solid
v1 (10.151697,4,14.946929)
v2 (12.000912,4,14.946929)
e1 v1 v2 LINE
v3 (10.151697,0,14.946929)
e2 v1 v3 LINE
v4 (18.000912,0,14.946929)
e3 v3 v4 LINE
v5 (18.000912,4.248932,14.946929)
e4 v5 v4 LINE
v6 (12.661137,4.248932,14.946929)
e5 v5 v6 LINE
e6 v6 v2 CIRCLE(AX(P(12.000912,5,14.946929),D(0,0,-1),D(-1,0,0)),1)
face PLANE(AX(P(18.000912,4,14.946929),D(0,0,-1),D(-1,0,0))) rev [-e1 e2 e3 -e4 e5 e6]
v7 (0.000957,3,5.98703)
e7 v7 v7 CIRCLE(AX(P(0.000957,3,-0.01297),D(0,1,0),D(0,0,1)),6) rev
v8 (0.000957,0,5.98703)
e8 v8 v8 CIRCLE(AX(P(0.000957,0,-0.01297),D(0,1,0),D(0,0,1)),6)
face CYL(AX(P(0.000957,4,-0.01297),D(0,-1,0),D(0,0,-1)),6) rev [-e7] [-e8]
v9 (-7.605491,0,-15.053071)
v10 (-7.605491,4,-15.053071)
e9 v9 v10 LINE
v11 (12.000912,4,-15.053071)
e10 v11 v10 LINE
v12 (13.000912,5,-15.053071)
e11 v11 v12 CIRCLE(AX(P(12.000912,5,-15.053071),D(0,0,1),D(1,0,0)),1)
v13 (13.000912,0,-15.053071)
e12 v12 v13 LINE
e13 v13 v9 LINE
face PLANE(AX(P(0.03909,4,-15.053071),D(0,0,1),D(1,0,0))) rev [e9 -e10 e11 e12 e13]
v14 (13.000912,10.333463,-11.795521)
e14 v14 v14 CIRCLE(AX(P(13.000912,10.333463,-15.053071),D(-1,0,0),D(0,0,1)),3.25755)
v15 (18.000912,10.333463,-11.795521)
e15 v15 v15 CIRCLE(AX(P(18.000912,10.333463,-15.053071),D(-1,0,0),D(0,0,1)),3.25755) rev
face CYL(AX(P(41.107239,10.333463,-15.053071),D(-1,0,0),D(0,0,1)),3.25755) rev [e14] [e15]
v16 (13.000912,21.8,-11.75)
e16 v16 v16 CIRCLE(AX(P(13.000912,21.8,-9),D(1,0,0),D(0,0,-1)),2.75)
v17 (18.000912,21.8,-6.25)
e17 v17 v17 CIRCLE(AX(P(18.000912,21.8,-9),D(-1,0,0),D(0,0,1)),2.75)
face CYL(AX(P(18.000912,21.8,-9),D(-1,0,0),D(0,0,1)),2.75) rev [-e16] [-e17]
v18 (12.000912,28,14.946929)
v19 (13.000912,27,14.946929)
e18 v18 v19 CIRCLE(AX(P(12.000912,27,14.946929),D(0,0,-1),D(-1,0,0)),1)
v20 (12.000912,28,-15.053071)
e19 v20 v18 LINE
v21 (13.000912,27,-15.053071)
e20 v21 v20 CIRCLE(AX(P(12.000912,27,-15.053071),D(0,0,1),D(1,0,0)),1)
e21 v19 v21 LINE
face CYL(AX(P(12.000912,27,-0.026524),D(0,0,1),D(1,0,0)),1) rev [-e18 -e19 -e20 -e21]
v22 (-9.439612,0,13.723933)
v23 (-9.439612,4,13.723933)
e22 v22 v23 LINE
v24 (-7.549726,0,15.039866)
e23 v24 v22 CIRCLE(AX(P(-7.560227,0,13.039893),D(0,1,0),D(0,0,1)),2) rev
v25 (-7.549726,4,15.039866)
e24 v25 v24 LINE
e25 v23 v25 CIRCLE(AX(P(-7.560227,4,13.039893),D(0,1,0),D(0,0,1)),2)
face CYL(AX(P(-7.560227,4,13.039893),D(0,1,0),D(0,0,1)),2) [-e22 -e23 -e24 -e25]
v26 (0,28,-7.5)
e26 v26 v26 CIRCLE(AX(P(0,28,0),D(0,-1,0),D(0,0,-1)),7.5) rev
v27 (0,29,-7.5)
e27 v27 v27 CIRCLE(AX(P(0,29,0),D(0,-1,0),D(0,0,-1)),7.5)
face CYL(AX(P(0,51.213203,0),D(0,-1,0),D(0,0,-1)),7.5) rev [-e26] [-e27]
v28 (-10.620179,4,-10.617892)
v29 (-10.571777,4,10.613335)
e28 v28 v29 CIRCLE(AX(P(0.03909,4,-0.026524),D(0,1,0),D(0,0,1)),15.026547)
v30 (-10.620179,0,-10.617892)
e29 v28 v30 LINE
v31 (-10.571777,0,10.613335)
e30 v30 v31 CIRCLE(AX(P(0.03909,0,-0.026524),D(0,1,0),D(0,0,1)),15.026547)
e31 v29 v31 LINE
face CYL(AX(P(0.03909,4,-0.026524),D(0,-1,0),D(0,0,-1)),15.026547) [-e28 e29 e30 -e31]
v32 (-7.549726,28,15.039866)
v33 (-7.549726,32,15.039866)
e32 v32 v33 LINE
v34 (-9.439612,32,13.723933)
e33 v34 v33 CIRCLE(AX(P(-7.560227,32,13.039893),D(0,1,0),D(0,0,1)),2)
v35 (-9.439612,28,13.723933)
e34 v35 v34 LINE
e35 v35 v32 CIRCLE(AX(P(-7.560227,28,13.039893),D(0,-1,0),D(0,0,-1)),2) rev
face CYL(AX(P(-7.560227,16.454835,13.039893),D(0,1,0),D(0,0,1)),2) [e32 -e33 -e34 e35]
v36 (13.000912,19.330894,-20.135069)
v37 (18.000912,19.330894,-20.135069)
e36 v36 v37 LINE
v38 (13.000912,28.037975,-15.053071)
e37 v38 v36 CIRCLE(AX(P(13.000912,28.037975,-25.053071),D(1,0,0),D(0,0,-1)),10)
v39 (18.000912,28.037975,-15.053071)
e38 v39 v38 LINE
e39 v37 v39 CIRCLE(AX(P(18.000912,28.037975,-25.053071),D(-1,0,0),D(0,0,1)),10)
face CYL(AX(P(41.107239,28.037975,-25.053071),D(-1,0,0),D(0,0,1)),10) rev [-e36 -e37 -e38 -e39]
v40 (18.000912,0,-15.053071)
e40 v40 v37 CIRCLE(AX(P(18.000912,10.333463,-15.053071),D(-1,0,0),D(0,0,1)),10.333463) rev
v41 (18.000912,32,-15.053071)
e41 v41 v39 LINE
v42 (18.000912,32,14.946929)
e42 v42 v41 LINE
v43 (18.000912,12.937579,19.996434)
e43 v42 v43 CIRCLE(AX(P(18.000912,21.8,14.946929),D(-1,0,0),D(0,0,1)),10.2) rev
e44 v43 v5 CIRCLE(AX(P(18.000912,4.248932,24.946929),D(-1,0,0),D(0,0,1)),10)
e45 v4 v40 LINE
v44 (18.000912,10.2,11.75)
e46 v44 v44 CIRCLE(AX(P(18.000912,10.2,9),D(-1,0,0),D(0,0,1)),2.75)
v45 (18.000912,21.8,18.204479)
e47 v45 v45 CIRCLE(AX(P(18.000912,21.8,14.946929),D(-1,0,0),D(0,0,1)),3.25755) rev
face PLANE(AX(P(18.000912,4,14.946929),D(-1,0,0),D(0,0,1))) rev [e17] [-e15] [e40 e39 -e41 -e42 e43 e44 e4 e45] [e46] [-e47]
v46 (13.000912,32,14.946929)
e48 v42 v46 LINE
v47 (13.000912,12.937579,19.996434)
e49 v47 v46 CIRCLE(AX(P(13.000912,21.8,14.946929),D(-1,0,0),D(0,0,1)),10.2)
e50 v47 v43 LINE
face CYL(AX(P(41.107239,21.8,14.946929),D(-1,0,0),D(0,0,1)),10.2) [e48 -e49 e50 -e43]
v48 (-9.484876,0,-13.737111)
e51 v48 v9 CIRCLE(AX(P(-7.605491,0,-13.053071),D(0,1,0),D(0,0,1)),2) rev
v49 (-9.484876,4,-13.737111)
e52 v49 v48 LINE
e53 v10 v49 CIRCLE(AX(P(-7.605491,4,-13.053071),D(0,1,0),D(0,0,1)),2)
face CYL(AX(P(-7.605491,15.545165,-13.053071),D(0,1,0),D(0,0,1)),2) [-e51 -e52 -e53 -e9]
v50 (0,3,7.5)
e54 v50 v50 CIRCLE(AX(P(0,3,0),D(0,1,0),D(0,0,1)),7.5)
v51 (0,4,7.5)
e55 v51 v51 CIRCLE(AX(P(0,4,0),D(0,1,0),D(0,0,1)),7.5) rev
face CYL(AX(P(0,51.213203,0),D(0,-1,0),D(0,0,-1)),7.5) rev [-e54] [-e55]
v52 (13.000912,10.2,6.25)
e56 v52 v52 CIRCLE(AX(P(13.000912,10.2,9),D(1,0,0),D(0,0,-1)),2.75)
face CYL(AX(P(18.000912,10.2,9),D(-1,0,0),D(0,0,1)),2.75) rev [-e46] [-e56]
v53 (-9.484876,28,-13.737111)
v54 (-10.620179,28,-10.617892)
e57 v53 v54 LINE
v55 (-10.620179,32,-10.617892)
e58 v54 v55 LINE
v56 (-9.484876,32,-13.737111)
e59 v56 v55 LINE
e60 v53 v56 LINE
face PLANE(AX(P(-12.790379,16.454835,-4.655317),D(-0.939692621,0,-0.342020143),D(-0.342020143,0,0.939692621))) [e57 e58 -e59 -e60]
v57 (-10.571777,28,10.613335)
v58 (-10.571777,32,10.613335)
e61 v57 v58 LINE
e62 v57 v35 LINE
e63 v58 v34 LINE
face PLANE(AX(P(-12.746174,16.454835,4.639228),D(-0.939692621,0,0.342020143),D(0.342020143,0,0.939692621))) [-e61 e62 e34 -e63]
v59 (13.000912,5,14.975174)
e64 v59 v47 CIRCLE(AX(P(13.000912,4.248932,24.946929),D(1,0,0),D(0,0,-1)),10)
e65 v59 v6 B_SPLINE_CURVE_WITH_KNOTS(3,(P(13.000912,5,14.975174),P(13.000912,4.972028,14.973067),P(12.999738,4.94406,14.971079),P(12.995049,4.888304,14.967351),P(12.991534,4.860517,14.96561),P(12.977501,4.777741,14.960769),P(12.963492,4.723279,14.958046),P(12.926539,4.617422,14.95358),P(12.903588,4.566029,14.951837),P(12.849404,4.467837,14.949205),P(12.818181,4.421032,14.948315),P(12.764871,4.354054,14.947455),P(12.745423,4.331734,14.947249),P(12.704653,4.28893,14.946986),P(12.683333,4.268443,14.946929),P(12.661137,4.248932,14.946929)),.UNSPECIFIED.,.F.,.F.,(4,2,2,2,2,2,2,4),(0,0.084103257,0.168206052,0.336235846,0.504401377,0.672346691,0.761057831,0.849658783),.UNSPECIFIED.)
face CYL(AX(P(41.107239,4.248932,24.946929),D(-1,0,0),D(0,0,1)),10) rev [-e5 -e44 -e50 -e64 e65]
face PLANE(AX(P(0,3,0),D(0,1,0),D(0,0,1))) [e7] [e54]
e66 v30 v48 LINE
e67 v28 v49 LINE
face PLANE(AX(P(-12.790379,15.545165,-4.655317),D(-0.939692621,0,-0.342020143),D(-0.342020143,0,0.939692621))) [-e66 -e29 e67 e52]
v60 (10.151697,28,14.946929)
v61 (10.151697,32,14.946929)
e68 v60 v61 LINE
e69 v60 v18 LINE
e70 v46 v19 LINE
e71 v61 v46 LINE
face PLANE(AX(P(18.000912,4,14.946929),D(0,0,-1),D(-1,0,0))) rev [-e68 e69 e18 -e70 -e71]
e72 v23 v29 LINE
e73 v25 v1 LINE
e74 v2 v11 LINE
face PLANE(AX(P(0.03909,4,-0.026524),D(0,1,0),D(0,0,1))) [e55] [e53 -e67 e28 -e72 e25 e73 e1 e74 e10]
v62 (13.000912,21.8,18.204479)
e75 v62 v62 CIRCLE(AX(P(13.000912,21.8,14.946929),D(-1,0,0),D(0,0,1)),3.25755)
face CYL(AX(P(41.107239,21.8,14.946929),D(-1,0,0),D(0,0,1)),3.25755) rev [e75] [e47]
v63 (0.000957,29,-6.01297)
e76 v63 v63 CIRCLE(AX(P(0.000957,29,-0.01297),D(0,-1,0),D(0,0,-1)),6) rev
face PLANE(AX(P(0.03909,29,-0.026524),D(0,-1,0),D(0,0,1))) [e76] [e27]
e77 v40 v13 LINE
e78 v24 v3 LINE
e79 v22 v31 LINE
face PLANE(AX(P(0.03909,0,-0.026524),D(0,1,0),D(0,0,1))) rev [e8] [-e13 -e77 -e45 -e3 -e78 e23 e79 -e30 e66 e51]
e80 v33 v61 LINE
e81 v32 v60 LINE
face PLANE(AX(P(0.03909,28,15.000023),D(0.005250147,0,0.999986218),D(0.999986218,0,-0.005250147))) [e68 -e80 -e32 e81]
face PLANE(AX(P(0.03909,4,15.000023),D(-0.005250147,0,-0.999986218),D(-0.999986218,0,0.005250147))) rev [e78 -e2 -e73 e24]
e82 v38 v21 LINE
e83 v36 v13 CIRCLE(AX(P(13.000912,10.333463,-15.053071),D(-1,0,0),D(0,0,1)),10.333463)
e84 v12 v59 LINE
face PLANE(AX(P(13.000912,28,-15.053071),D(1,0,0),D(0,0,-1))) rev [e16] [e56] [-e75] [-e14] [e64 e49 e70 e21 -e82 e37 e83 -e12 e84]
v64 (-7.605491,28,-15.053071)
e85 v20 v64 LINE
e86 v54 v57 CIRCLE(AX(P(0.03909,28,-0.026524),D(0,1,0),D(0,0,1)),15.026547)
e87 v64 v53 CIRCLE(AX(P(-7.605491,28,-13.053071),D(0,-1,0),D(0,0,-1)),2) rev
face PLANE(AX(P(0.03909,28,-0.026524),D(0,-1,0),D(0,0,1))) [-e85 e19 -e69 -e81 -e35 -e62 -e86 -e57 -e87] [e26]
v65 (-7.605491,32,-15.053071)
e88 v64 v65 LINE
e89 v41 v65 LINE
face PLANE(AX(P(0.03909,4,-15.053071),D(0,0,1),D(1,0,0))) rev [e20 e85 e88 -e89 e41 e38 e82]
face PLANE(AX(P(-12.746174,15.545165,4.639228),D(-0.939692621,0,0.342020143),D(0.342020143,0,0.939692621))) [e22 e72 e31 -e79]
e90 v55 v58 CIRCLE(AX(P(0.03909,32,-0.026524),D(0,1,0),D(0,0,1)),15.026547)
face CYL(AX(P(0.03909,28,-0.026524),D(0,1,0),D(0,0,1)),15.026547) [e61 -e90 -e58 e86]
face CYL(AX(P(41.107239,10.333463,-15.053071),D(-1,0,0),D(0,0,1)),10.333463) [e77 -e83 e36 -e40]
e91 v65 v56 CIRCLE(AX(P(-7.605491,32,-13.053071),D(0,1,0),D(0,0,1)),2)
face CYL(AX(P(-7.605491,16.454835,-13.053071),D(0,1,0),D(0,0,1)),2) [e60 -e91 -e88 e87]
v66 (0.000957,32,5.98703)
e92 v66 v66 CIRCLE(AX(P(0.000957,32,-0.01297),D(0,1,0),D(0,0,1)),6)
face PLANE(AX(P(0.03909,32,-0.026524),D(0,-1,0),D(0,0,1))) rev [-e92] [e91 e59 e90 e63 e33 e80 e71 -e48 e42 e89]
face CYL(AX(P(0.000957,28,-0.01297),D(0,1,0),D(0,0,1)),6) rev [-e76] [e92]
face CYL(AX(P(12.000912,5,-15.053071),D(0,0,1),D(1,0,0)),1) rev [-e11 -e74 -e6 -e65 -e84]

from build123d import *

# Parameters (mm, degrees)
SKETCH2_R               = 6
BOSS_EXTRUDE1_DEPTH     = 4
SKETCH3_W               = 5
SKETCH3_H               = 30
BOSS_EXTRUDE3_DEPTH     = 24
BOSS_EXTRUDE5_DEPTH     = 5
SKETCH7_3_R             = 3.25755
CUT_EXTRUDE3_DEPTH      = 5
FILLET3_R               = 10
CUT_EXTRUDE4_DEPTH      = 25
CUT_EXTRUDE4_DEPTH_BACK = 1
SKETCH8_R               = 7.5
CUT_EXTRUDE5_DEPTH      = 50.515905416
CUT_EXTRUDE5_DEPTH_BACK = 50.515905416
SKETCH9_R               = 2.75
FILLET4_R               = 1
BOSS_EXTRUDE6_DEPTH     = 4
FILLET6_R               = 2
BOSS_EXTRUDE7_DEPTH     = 4


with BuildPart() as part:
    # Sketch2 → Boss-Extrude1 (new body)
    with BuildSketch(Plane(origin=(0, 0, 0), x_dir=(1, 0, 0), z_dir=(0, 1, 0))):
        with BuildLine():
            Line((18.000912404, -14.946929254), (18.000912404, 15.053070746))
            Line((18.000912404, 15.053070746), (0.039090451, 15.053070746))
            ThreePointArc((0.039090451, 15.053070746), (-10.199781301, 11.024824414), (-14.94907539, 1.099832277))
            ThreePointArc((-14.94907539, 1.099832277), (-10.959209921, -10.21234771), (0.039090451, -15.000022662))
            Line((0.039090451, -15.000022662), (10.151696986, -14.946929254))
            Line((10.151696986, -14.946929254), (18.000912404, -14.946929254))
        make_face()
        with Locations(Location((0.000957071, 0.012970337, 0), (0, 0, 270))):
            Circle(SKETCH2_R, mode=Mode.SUBTRACT)
    boss_extrude1 = extrude(amount=BOSS_EXTRUDE1_DEPTH)

    # Sketch3 → Boss-Extrude3 (add)
    with BuildSketch(Plane(origin=(0, 4, 0), x_dir=(1, 0, 0), z_dir=(0, 1, 0))):
        with Locations((15.500912404, 0.053070746)):
            Rectangle(SKETCH3_W, SKETCH3_H)
    extrude(amount=BOSS_EXTRUDE3_DEPTH)

    # Mirror1: Boss-Extrude1 across plane
    add(boss_extrude1.mirror(Plane.ZX.offset(16)))

    # Sketch7 → Boss-Extrude5 (add)
    with BuildSketch(Plane.ZY.offset(-13.000912404)):
        with BuildLine():
            Line((-15.053070746, 0), (-15.053070746, 4))
            Line((-15.053070746, 4), (-15.053070746, 7.075913265))
            ThreePointArc((-15.053070746, 7.075913265), (-18.310620746, 10.333463265), (-15.053070746, 13.591013265))
            Line((-15.053070746, 13.591013265), (-15.053070746, 20.666926531))
            ThreePointArc((-15.053070746, 20.666926531), (-25.386534011, 10.333463265), (-15.053070746, 0))
        make_face()
        with BuildLine():
            ThreePointArc((25.146929254, 21.8), (22.159418422, 29.012489168), (14.946929254, 32))
            Line((14.946929254, 32), (14.946929254, 28))
            Line((14.946929254, 28), (14.946929254, 25.05755))
            ThreePointArc((14.946929254, 25.05755), (17.250364949, 24.103435695), (18.204479254, 21.8))
            ThreePointArc((18.204479254, 21.8), (17.250364949, 19.496564305), (14.946929254, 18.54245))
            Line((14.946929254, 18.54245), (14.946929254, 11.6))
            ThreePointArc((14.946929254, 11.6), (22.159418422, 14.587510832), (25.146929254, 21.8))
        make_face()
        with BuildLine():
            Line((14.946929254, 28), (14.946929254, 32))
            ThreePointArc((14.946929254, 32), (4.746929254, 21.8), (14.946929254, 11.6))
            Line((14.946929254, 11.6), (14.946929254, 18.54245))
            ThreePointArc((14.946929254, 18.54245), (11.689379254, 21.8), (14.946929254, 25.05755))
            Line((14.946929254, 25.05755), (14.946929254, 28))
        make_face()
    extrude(amount=-BOSS_EXTRUDE5_DEPTH)

    # Sketch7<3> → Cut-Extrude3 (cut)
    with BuildSketch(Plane.ZY.offset(-13.000912404)):
        with Locations((14.946929254, 21.8)):
            Circle(SKETCH7_3_R)
        with Locations((-15.053070746, 10.333463265)):
            Circle(SKETCH7_3_R)
    extrude(amount=-CUT_EXTRUDE3_DEPTH, mode=Mode.SUBTRACT)

    # Fillet3
    # the kernel refuses this fillet: 10 mm, written as the material it adds along each edge
    with BuildSketch(Plane(origin=(13.000912404, 20.666926531, -15.053070746), x_dir=(0, -0.25425566101904284, -0.9671370424297528), z_dir=(1, 0, 0))) as fillet3_piece_1:
        with BuildLine():
            CenterArc((7.797239676, 9.671370424), FILLET3_R, 194.729484057, 60.541031886)
            Line((-1.874130748, 7.128813814), (0, 0))
            ThreePointArc((0, 0), (2.627341533, 0.339588165), (5.254683066, 0))
        make_face()
    extrude(amount=5)
    with BuildSketch(Plane(origin=(13.000912404, 11.6, 14.946929254), x_dir=(0, -1, 0), z_dir=(1, 0, 0))) as fillet3_piece_2:
        with BuildLine():
            CenterArc((7.351068344, -10), FILLET3_R, 90, 60.326985198)
            ThreePointArc((-1.337579351, -5.04950495), (-0.340063626, -2.611829759), (0, 0))
            Line((0, 0), (7.351068344, 0))
        make_face()
    extrude(amount=5)

    # Sketch8 → Cut-Extrude4 (cut, two sides: drawn at the far end of the back side and taken through both)
    with BuildSketch(Plane(origin=(0, 4, 0), x_dir=(1, 0, 0), z_dir=(0, 1, 0)).offset(-CUT_EXTRUDE4_DEPTH_BACK)):
        with Locations(Location((0, 0, 0), (0, 0, 90))):
            Circle(SKETCH8_R)
    extrude(amount=CUT_EXTRUDE4_DEPTH + CUT_EXTRUDE4_DEPTH_BACK, mode=Mode.SUBTRACT)

    # Sketch9 → Cut-Extrude5 (cut, two sides: drawn at the far end of the back side and taken through both)
    with BuildSketch(Plane.ZY.offset(-13.000912404).offset(-CUT_EXTRUDE5_DEPTH_BACK)):
        with Locations((9, 10.2)):
            Circle(SKETCH9_R)
        with Locations((-9, 21.8)):
            Circle(SKETCH9_R)
    extrude(amount=CUT_EXTRUDE5_DEPTH + CUT_EXTRUDE5_DEPTH_BACK, mode=Mode.SUBTRACT)

    # Fillet4
    fillet4_edges = [part.edges().sort_by_distance(p)[0] for p in [
        (13.000912404, 4, -0.053070746),
        (13.000912404, 28, -0.053070746),
    ]]
    fillet(fillet4_edges, radius=FILLET4_R)

    # Sketch10 → Boss-Extrude6 (add)
    with BuildSketch(Plane.XZ):
        with BuildLine():
            ThreePointArc((0.039090451, -15.053070746), (-5.733491903, -13.900038334), (-10.620178824, -10.617892431))
            Line((-10.620178824, -10.617892431), (-9.005905934, -15.053070746))
            Line((-9.005905934, -15.053070746), (0.039090451, -15.053070746))
        make_face()
        with BuildLine():
            ThreePointArc((-10.571777141, 10.613334735), (-5.701848976, 13.860114152), (0.039090451, 15.000022662))
            Line((0.039090451, 15.000022662), (-8.957960629, 15.047259158))
            Line((-8.957960629, 15.047259158), (-10.571777141, 10.613334735))
        make_face()
    extrude(amount=-BOSS_EXTRUDE6_DEPTH)

    # Fillet6
    fillet6_edges = [part.edges().sort_by_distance(p)[0] for p in [
        (-9.005905934, 2, -15.053070746),
        (-8.957960629, 2, 15.047259158),
    ]]
    fillet(fillet6_edges, radius=FILLET6_R)

    # Sketch11 → Boss-Extrude7 (add)
    with BuildSketch(Plane(origin=(0, 32, 0), x_dir=(1, 0, 0), z_dir=(0, 1, 0))):
        with BuildLine():
            ThreePointArc((0.039090451, -15.000022662), (-5.701848976, -13.860114152), (-10.571777141, -10.613334735))
            Line((-10.571777141, -10.613334735), (-9.439611791, -13.723933469))
            ThreePointArc((-9.439611791, -13.723933469), (-8.703074785, -14.681202997), (-7.549726254, -15.039865618))
            Line((-7.549726254, -15.039865618), (0.039090451, -15.000022662))
        make_face()
        with BuildLine():
            Line((-9.484876099, 13.737111032), (-10.620178824, 10.617892431))
            ThreePointArc((-10.620178824, 10.617892431), (-5.733491903, 13.900038334), (0.039090451, 15.053070746))
            Line((0.039090451, 15.053070746), (-7.605490857, 15.053070746))
            ThreePointArc((-7.605490857, 15.053070746), (-8.75264373, 14.691374834), (-9.484876099, 13.737111032))
        make_face()
    extrude(amount=-BOSS_EXTRUDE7_DEPTH)


solid = part.part
